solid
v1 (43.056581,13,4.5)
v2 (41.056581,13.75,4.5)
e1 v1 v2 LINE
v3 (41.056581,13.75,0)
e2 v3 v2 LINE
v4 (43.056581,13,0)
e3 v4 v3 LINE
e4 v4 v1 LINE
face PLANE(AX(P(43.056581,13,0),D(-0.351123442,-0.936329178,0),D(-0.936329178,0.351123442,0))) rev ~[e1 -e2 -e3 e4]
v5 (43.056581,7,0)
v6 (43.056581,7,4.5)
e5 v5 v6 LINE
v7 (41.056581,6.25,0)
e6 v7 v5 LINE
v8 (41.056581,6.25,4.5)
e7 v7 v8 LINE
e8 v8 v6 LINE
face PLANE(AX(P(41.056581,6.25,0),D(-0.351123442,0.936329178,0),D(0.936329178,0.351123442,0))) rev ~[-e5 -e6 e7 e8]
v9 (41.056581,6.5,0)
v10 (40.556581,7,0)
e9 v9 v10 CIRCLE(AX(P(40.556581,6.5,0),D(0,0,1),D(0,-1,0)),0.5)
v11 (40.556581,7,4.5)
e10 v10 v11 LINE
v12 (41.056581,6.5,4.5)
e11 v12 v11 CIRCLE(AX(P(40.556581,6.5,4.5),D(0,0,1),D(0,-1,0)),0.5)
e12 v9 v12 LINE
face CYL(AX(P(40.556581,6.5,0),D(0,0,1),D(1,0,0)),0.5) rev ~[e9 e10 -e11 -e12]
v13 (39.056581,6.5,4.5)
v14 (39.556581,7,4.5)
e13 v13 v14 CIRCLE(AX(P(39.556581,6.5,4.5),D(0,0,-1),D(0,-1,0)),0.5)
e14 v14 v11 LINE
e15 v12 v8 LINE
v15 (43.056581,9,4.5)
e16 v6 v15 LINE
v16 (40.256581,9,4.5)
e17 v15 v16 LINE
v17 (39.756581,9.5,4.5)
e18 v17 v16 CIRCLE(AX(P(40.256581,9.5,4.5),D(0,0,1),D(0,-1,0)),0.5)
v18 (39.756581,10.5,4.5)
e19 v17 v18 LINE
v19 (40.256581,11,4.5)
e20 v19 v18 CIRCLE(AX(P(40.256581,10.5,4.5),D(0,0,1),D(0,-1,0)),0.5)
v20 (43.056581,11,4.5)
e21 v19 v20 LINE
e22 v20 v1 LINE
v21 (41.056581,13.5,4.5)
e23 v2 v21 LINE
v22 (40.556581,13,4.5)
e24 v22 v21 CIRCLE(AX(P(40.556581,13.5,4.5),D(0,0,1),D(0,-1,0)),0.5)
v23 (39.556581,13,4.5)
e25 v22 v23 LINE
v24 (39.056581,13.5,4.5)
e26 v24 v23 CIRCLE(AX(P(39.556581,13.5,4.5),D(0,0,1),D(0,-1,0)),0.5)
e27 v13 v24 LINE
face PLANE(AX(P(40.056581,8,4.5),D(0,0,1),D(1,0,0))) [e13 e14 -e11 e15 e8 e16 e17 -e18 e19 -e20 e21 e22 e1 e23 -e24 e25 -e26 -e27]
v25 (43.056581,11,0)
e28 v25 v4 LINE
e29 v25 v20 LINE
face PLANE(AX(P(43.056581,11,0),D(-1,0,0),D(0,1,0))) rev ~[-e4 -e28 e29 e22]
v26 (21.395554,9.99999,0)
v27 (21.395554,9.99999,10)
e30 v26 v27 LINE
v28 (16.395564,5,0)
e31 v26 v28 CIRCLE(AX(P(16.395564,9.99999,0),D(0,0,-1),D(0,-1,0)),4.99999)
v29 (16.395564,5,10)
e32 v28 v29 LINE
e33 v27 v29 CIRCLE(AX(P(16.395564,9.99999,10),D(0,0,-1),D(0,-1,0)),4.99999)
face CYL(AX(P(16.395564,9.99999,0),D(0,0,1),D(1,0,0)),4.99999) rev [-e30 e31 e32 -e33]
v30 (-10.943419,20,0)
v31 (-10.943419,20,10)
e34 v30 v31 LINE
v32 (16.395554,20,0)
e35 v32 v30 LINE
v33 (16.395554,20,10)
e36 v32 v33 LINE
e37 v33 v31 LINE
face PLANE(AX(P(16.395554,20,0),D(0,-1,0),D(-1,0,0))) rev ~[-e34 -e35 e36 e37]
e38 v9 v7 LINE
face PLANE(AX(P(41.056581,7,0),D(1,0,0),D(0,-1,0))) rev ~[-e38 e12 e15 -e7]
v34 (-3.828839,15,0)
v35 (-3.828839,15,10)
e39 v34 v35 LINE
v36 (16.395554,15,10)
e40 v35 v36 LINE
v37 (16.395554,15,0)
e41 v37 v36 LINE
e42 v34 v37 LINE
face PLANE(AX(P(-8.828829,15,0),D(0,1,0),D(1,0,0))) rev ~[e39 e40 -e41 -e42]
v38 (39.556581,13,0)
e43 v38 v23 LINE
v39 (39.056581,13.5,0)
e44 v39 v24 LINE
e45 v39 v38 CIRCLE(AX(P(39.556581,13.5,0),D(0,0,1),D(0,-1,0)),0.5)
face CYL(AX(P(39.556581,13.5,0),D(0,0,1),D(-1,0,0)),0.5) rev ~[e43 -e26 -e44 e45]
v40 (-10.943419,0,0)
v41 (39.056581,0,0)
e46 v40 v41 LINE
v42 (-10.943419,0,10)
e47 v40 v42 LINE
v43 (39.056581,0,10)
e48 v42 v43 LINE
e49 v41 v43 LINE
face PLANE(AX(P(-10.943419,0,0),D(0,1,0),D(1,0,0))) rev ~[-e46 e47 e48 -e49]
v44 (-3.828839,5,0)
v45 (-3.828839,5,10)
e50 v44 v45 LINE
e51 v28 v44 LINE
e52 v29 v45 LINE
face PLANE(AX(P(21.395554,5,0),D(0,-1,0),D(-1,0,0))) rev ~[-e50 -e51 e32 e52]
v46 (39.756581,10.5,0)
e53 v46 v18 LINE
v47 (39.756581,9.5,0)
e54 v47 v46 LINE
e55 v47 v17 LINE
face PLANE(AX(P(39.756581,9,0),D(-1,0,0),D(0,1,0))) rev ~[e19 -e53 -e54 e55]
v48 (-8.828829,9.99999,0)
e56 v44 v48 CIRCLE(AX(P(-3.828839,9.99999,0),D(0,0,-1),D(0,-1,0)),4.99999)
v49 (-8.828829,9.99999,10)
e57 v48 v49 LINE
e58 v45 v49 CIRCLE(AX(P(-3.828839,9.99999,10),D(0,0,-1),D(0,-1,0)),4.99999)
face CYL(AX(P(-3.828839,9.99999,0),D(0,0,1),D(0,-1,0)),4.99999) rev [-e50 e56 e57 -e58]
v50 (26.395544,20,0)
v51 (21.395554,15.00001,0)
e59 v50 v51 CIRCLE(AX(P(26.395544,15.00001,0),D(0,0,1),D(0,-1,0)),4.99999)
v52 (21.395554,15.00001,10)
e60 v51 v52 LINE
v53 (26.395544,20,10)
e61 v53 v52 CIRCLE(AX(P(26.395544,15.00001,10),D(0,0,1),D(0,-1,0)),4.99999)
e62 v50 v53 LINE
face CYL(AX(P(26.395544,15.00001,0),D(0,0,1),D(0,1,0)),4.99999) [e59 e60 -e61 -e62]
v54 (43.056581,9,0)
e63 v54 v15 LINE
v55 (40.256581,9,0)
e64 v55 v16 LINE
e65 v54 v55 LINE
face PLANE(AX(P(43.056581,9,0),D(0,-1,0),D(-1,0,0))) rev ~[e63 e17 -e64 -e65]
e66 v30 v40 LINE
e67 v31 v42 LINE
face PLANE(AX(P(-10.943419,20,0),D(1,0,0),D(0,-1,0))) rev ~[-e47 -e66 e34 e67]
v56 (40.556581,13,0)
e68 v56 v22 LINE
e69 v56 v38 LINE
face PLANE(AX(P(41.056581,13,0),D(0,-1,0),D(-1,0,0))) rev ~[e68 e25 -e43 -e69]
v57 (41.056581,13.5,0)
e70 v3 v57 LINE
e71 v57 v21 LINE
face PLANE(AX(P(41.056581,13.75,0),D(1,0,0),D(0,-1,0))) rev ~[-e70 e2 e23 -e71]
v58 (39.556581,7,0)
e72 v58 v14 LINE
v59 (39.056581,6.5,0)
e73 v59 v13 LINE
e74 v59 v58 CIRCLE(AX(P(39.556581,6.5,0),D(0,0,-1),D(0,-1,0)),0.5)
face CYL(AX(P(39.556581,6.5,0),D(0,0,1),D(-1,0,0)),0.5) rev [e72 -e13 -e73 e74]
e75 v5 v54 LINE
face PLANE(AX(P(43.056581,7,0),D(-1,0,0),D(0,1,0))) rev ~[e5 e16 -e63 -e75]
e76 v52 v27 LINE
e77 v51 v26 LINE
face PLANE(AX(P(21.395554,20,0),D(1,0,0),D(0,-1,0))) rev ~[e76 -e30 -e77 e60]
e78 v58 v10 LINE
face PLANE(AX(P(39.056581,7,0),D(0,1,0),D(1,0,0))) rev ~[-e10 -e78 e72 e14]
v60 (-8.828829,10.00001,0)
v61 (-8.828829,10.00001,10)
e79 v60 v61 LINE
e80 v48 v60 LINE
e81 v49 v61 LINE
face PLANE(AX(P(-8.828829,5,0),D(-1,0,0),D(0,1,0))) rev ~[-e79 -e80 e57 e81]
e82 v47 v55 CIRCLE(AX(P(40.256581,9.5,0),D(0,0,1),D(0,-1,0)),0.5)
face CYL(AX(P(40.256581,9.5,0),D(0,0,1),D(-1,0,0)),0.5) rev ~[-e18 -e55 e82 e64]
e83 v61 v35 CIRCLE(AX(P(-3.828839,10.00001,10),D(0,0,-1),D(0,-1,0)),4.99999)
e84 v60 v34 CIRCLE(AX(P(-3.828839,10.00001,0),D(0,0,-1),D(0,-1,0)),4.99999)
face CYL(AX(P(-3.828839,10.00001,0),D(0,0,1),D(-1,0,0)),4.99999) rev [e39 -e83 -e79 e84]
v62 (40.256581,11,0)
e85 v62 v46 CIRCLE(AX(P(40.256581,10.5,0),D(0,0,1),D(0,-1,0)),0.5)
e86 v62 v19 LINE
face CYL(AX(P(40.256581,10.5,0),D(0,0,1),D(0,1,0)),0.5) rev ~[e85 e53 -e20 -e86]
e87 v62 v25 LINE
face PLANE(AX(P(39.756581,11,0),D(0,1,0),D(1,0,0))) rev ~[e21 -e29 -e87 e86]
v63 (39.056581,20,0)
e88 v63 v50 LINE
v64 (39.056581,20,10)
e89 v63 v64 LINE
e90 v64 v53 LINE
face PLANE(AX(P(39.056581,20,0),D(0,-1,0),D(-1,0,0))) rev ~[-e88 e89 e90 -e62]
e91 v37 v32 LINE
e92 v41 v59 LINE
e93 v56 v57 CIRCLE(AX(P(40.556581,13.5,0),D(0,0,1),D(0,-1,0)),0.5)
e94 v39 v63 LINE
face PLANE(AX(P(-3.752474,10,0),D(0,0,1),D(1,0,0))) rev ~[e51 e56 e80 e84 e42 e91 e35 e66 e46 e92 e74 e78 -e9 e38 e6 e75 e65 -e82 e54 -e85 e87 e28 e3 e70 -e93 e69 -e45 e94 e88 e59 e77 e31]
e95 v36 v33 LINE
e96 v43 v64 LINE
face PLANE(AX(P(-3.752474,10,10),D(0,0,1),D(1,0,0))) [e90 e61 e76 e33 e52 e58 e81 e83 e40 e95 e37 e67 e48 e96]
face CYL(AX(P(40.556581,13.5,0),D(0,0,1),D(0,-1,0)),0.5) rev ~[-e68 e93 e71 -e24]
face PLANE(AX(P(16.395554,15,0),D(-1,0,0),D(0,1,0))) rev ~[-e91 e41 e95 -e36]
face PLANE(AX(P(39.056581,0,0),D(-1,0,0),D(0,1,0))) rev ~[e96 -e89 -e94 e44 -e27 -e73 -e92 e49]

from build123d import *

# Parameters (mm, degrees)
F0_W     = 10.7198789741
F0_H     = 5
F1_DEPTH = 10
F0_W_2   = 2
F0_H_2   = 2
F0_W_3   = 0.7
F2_DEPTH = 4.5
F3_R     = 4.99999
F4_R     = 0.5


# Not quite as in the source:
# - a fillet or chamfer is up to 0.001 mm smaller than in the source, because OpenCascade refuses the exact size


with BuildPart() as f1:
    # F0 (on Top) → F1 (new body)
    with BuildSketch(Plane.XY):
        Polygon((-10.9434188306, 20), (-10.9434188306, 0), (5.6756753474, 0), (5.6756753474, 5), (-8.8288290426, 5), (-8.8288290426, 15), (5.6756753474, 15), (5.6756753474, 20), align=None)
        Polygon((5.6756753474, 5), (5.6756753474, 0), (39.0565811694, 0), (39.0565811694, 7), (39.0565811694, 9), (39.0565811694, 11), (39.0565811694, 13), (39.0565811694, 20), (21.3955543215, 20), (21.3955543215, 15), (21.3955543215, 5), align=None)
        with Locations((11.0356148345, 17.5)):
            Rectangle(F0_W, F0_H)
    extrude(amount=F1_DEPTH)

    # F0 (on Top) → F2 (join)
    with BuildSketch(Plane.XY):
        Polygon((39.0565811694, 9), (39.0565811694, 7), (41.0565811694, 7), (41.0565811694, 9), (39.7565811694, 9), align=None)
        with Locations((42.0565811694, 8)):
            Rectangle(F0_W_2, F0_H_2)
        Polygon((43.0565811694, 7), (41.0565811694, 7), (41.0565811694, 6.25), align=None)
        Polygon((39.0565811694, 13), (39.0565811694, 11), (39.7565811694, 11), (41.0565811694, 11), (41.0565811694, 13), align=None)
        with Locations((42.0565811694, 12)):
            Rectangle(F0_W_2, F0_H_2)
        Polygon((41.0565811694, 13.75), (41.0565811694, 13), (43.0565811694, 13), align=None)
        with Locations((39.4065811694, 10)):
            Rectangle(F0_W_3, F0_H_2)
    extrude(amount=F2_DEPTH)

    # F3 (radius 5 in the source; OpenCascade refuses exactly that, so slightly less here)
    f3_edges = [f1.edges().sort_by_distance(p)[0] for p in [
        (-8.828829, 15, 5),
        (-8.828829, 5, 5),
        (21.395554, 5, 5),
        (21.395554, 20, 5),
    ]]
    fillet(f3_edges, radius=F3_R)

    # F4
    f4_edges = [f1.edges().sort_by_distance(p)[0] for p in [
        (39.056581, 13, 2.25),
        (39.056581, 7, 2.25),
        (41.056581, 7, 2.25),
        (41.056581, 13, 2.25),
        (39.756581, 11, 2.25),
        (39.756581, 9, 2.25),
    ]]
    fillet(f4_edges, radius=F4_R)


solid = f1.part
